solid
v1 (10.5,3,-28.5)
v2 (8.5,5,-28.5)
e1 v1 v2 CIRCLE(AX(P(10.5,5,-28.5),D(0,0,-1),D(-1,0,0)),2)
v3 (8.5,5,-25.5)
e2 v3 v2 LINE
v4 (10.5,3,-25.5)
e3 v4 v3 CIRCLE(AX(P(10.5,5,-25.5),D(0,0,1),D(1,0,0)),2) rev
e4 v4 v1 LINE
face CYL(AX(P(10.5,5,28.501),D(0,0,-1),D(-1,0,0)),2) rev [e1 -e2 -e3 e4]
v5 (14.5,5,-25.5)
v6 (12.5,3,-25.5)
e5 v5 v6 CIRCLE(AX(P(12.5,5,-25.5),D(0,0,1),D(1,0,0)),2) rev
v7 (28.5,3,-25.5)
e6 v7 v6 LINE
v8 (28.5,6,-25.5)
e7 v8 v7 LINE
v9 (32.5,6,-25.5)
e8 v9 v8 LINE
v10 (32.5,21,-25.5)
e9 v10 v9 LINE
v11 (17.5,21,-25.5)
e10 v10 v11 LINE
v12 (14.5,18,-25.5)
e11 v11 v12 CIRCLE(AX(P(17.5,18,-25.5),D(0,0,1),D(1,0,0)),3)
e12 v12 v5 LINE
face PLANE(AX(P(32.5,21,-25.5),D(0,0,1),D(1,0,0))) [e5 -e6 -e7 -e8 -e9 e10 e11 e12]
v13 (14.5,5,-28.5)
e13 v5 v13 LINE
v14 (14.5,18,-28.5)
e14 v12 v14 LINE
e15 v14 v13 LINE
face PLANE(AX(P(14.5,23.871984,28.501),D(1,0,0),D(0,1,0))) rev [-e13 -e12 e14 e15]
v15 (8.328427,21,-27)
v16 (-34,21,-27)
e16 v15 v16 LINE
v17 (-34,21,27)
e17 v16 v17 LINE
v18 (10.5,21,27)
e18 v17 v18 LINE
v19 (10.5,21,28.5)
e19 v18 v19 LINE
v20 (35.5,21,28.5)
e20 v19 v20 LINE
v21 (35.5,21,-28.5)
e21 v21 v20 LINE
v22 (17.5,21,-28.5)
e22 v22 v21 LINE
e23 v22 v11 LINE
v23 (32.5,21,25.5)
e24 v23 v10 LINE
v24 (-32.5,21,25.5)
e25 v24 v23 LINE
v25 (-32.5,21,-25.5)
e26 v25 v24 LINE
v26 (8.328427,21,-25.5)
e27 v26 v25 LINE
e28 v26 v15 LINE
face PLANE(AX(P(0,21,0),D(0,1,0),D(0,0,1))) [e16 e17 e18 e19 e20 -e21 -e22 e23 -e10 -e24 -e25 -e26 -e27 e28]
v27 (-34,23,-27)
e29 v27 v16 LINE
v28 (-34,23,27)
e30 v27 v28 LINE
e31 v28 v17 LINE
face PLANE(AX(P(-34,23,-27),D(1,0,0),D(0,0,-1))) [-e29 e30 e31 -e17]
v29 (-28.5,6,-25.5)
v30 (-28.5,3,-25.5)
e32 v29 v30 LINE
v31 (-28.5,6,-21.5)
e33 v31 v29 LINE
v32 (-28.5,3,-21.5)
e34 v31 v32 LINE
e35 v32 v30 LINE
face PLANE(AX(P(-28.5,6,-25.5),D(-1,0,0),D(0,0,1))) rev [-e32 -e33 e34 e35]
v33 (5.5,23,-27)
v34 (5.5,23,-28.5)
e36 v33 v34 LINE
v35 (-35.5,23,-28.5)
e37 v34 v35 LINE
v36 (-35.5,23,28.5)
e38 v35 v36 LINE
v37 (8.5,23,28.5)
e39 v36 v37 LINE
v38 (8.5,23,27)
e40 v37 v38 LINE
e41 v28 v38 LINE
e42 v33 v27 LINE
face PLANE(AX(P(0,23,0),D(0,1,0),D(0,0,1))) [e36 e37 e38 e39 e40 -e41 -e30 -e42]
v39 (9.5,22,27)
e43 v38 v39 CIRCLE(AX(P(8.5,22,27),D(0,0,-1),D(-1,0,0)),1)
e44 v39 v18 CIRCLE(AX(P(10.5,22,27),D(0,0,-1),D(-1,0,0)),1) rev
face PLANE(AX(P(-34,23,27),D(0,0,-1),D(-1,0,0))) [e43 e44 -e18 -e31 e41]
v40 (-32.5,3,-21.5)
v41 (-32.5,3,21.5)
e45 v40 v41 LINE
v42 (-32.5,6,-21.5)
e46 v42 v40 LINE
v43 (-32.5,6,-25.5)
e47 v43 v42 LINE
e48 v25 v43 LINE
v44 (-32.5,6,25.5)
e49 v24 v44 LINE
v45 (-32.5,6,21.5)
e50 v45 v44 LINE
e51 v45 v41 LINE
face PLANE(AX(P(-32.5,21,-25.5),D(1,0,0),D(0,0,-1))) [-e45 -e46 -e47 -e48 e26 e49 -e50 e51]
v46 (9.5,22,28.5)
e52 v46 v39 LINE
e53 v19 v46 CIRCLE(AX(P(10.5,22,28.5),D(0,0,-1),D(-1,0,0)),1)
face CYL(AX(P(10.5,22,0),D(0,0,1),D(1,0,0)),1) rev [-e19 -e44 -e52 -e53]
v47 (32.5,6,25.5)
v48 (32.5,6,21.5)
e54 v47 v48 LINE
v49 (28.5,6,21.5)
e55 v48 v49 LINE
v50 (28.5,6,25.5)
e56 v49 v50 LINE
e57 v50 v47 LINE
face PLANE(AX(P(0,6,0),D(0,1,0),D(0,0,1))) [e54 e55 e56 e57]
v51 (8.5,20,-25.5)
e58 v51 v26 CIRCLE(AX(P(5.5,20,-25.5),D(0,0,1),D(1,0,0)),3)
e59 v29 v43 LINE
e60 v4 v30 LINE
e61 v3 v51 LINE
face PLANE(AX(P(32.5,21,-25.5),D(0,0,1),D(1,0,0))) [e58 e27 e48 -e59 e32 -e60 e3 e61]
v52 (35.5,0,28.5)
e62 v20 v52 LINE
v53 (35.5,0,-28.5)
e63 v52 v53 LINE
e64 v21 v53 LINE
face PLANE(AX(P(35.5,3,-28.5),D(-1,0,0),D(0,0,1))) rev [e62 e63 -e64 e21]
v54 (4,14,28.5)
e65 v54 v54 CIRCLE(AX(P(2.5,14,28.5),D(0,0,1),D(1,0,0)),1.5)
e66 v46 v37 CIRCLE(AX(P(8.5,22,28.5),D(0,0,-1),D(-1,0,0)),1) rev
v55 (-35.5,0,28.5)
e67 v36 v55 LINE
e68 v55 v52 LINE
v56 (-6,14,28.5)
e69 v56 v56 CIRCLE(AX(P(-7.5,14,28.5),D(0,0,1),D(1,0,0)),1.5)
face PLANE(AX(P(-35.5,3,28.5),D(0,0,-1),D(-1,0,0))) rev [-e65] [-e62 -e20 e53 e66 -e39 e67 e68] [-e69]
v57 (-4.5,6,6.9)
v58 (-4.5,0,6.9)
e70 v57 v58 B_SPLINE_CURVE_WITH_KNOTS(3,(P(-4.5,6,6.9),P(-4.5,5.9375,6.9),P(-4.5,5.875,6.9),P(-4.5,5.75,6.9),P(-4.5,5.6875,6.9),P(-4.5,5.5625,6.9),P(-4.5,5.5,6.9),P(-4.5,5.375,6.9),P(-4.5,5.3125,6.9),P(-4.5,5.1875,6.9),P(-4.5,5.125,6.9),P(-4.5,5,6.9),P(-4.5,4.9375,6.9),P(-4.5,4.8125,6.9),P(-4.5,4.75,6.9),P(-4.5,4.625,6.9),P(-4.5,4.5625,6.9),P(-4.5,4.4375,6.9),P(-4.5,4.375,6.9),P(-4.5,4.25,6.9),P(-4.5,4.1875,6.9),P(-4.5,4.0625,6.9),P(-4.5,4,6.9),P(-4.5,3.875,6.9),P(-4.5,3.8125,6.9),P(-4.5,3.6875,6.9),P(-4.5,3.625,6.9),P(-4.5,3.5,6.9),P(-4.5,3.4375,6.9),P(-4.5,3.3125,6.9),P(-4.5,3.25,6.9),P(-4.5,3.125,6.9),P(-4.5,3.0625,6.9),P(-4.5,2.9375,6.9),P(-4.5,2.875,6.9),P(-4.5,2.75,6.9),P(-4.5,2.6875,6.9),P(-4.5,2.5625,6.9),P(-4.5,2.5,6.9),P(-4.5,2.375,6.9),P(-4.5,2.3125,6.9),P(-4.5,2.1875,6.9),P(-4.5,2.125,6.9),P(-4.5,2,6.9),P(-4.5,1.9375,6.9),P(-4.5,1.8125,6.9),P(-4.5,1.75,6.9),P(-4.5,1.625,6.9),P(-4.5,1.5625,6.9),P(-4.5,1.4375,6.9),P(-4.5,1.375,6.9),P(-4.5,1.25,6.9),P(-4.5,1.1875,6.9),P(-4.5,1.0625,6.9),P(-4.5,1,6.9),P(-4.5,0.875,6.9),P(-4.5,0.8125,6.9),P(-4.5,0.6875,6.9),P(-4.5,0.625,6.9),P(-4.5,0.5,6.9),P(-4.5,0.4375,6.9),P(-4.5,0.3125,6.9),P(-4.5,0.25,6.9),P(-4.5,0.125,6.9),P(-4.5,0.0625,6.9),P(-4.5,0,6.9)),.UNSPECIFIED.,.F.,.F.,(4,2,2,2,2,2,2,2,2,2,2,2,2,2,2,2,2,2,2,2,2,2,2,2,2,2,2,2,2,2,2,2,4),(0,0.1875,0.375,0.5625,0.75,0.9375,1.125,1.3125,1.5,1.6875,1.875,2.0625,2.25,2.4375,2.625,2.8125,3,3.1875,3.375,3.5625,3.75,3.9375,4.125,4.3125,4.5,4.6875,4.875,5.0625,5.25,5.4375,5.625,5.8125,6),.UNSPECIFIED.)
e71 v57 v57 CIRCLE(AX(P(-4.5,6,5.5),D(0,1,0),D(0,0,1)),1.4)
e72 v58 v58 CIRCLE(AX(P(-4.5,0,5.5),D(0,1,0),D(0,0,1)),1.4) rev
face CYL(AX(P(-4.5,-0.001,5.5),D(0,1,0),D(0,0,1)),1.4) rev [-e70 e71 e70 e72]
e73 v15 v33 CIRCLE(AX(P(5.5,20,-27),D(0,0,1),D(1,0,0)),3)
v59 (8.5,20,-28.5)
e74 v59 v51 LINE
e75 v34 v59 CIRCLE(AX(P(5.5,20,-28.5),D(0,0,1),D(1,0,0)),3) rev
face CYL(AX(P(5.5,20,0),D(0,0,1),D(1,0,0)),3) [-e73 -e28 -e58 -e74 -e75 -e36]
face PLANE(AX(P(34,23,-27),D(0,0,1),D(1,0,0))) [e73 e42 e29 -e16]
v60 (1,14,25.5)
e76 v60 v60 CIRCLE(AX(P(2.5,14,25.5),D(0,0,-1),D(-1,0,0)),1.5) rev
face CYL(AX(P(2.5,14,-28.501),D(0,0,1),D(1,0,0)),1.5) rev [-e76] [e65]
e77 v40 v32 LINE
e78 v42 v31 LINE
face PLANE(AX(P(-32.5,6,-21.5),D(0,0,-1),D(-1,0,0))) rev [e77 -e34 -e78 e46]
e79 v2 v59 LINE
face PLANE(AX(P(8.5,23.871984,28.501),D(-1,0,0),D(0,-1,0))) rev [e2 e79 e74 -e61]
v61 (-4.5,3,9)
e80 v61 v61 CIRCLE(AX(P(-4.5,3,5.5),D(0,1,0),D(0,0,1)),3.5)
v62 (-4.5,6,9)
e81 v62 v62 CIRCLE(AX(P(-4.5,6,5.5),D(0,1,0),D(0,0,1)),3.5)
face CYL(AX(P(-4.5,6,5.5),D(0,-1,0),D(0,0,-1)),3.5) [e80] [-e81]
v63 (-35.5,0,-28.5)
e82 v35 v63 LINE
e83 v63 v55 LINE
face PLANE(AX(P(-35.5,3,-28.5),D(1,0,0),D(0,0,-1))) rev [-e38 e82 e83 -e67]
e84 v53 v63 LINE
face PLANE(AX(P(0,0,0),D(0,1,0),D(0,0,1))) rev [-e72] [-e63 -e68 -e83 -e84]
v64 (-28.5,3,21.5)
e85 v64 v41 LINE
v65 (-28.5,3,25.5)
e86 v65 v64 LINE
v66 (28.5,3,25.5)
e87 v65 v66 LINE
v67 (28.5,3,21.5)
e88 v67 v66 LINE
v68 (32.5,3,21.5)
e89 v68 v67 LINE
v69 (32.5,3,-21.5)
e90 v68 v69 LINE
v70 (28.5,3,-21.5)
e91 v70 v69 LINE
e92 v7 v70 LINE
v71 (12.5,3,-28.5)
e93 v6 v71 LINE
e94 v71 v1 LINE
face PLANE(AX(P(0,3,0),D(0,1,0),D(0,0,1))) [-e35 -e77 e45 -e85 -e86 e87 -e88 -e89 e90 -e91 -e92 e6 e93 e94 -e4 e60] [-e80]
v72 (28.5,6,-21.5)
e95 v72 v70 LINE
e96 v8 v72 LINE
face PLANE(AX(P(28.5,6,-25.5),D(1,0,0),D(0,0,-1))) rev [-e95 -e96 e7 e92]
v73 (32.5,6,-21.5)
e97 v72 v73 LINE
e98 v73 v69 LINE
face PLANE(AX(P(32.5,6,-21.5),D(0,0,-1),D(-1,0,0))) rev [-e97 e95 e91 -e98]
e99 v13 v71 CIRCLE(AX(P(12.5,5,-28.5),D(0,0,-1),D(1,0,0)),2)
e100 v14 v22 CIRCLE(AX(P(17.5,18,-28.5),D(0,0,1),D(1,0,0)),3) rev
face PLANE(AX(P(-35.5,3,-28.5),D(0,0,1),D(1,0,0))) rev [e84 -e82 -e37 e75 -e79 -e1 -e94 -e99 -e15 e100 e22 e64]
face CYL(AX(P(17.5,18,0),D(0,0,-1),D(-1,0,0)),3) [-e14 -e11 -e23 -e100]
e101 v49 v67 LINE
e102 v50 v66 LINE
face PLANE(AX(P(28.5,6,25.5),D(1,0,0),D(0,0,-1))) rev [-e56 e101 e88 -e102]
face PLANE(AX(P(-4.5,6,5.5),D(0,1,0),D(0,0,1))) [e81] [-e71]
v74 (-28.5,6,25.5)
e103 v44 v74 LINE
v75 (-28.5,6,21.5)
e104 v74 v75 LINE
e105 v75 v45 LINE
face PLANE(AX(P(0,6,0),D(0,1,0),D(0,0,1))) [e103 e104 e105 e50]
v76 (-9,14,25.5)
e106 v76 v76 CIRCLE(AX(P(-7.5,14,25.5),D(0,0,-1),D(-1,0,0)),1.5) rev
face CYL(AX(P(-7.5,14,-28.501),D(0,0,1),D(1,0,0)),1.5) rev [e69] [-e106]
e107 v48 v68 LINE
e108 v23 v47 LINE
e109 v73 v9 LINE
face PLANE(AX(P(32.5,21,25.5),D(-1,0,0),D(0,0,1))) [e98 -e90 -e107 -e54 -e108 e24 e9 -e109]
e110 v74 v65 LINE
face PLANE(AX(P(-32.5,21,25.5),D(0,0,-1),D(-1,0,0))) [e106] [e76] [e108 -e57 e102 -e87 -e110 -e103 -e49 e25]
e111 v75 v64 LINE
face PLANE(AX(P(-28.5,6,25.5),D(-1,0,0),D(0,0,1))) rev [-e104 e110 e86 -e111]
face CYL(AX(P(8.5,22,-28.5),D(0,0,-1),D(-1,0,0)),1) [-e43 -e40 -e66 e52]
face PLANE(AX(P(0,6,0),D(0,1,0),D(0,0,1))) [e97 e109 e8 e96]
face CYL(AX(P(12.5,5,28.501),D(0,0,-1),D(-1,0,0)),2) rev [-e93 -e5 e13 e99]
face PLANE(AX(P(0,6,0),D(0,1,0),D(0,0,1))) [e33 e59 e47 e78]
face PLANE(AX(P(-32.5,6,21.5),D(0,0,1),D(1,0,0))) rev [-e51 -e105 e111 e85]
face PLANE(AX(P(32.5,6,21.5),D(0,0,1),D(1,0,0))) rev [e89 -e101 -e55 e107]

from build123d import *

# Parameters (mm, degrees)
SKETCH1_W           = 71
SKETCH1_H           = 57
BOSS_EXTRUDE1_DEPTH = 3
SKETCH2_W           = 71
SKETCH2_H           = 57
SKETCH2_W_2         = 65
SKETCH2_H_2         = 51
BOSS_EXTRUDE2_DEPTH = 18
SKETCH3_W           = 4
SKETCH3_H           = 4
BOSS_EXTRUDE3_DEPTH = 3
SKETCH4_R           = 3.5
BOSS_EXTRUDE4_DEPTH = 3
CUT_EXTRUDE1_REACH  = 49.932
SKETCH5_R           = 1.4
SKETCH6_W           = 71
SKETCH6_H           = 57
SKETCH6_W_2         = 68
SKETCH6_H_2         = 54
BOSS_EXTRUDE5_DEPTH = 2
SKETCH7_W           = 26
SKETCH7_H           = 2
CUT_EXTRUDE2_DEPTH  = 71.980631161
FILLET1_R           = 1
CUT_EXTRUDE3_REACH  = 72.981
FILLET2_R           = 3
FILLET3_R           = 3
CUT_EXTRUDE4_REACH  = 72.981
SKETCH9_R           = 1.5


with BuildPart() as part:
    # Sketch1 → Boss-Extrude1 (new body)
    with BuildSketch(Plane(origin=(0, 0, 0), x_dir=(1, 0, 0), z_dir=(0, 1, 0))):
        Rectangle(SKETCH1_W, SKETCH1_H)
    extrude(amount=BOSS_EXTRUDE1_DEPTH)

    # Sketch2 → Boss-Extrude2 (add)
    with BuildSketch(Plane(origin=(0, 3, 0), x_dir=(1, 0, 0), z_dir=(0, 1, 0))):
        Rectangle(SKETCH2_W, SKETCH2_H)
        Rectangle(SKETCH2_W_2, SKETCH2_H_2, mode=Mode.SUBTRACT)
    extrude(amount=BOSS_EXTRUDE2_DEPTH)

    # Sketch3 → Boss-Extrude3 (add)
    with BuildSketch(Plane(origin=(0, 3, 0), x_dir=(1, 0, 0), z_dir=(0, 1, 0))):
        with Locations((-30.5, 23.5)):
            Rectangle(SKETCH3_W, SKETCH3_H)
        with Locations((30.5, 23.5)):
            Rectangle(SKETCH3_W, SKETCH3_H)
        with Locations((30.5, -23.5)):
            Rectangle(SKETCH3_W, SKETCH3_H)
        with Locations((-30.5, -23.5)):
            Rectangle(SKETCH3_W, SKETCH3_H)
    extrude(amount=BOSS_EXTRUDE3_DEPTH)

    # Sketch4 → Boss-Extrude4 (add)
    with BuildSketch(Plane(origin=(0, 3, 0), x_dir=(1, 0, 0), z_dir=(0, 1, 0))):
        with Locations(Location((-4.5, -5.5, 0), (0, 0, 270))):
            Circle(SKETCH4_R)
    extrude(amount=BOSS_EXTRUDE4_DEPTH)

    # Sketch5 → Cut-Extrude1 (cut, up to next)
    with BuildSketch(Plane(origin=(0, 6, 0), x_dir=(1, 0, 0), z_dir=(0, 1, 0)), mode=Mode.PRIVATE) as cut_extrude1_sk1:
        with Locations(Location((-4.5, -5.5, 0), (0, 0, 270))):
            Circle(SKETCH5_R)
    cut_extrude1_tool1 = extrude(cut_extrude1_sk1.sketch, amount=-CUT_EXTRUDE1_REACH, mode=Mode.PRIVATE) & part.part
    add(cut_extrude1_tool1.solids().sort_by_distance((-4.5, 6, 5.5))[0], mode=Mode.SUBTRACT)

    # Sketch6 → Boss-Extrude5 (add)
    with BuildSketch(Plane(origin=(0, 21, 0), x_dir=(1, 0, 0), z_dir=(0, 1, 0))):
        Rectangle(SKETCH6_W, SKETCH6_H)
        Rectangle(SKETCH6_W_2, SKETCH6_H_2, mode=Mode.SUBTRACT)
    extrude(amount=BOSS_EXTRUDE5_DEPTH)

    # Sketch7 → Cut-Extrude2 (cut, through all)
    with BuildSketch(Plane.XY.offset(28.5)):
        with Locations((22.5, 22)):
            Rectangle(SKETCH7_W, SKETCH7_H)
    extrude(amount=-CUT_EXTRUDE2_DEPTH, mode=Mode.SUBTRACT)

    # Fillet1
    fillet1_edges = [part.edges().sort_by_distance(p)[0] for p in [
        (9.5, 21, -27.75),
        (9.5, 21, 27.75),
    ]]
    fillet(fillet1_edges, radius=FILLET1_R)
    fillet1_2_edges = [part.edges().sort_by_distance(p)[0] for p in [
        (9.5, 23, -27.75),
        (9.5, 23, 27.75),
    ]]
    fillet(fillet1_2_edges, radius=FILLET1_R - 0.0001)  # a hair under: the kernel refuses the full size

    # Sketch8 → Cut-Extrude3 (cut, up to next)
    with BuildSketch(Plane(origin=(0, 0, -28.5), x_dir=(-1, 0, 0), z_dir=(0, 0, -1)), mode=Mode.PRIVATE) as cut_extrude3_sk1:
        with BuildLine():
            Line((-14.5, 23.871984023), (-8.5, 23.871984023))
            Line((-8.5, 23.871984023), (-8.5, 5))
            ThreePointArc((-8.5, 5), (-9.085786438, 3.585786438), (-10.5, 3))
            Line((-10.5, 3), (-12.5, 3))
            ThreePointArc((-12.5, 3), (-13.914213562, 3.585786438), (-14.5, 5))
            Line((-14.5, 5), (-14.5, 23.871984023))
        make_face()
    cut_extrude3_tool1 = extrude(cut_extrude3_sk1.sketch, amount=-CUT_EXTRUDE3_REACH, mode=Mode.PRIVATE) & part.part
    add(cut_extrude3_tool1.solids().sort_by_distance((11.5, 13.574839, -28.5))[0], mode=Mode.SUBTRACT)

    # Fillet2
    fillet2_edges = [part.edges().sort_by_distance(p)[0] for p in [
        (14.5, 21, -27),
    ]]
    fillet(fillet2_edges, radius=FILLET2_R)

    # Fillet3
    fillet3_edges = [part.edges().sort_by_distance(p)[0] for p in [
        (8.5, 23, -27.75),
    ]]
    fillet(fillet3_edges, radius=FILLET3_R)

    # Sketch9 → Cut-Extrude4 (cut, up to next)
    with BuildSketch(Plane.XY.offset(28.5), mode=Mode.PRIVATE) as cut_extrude4_sk1:
        with Locations((2.5, 14)):
            Circle(SKETCH9_R)
    cut_extrude4_tool1 = extrude(cut_extrude4_sk1.sketch, amount=-CUT_EXTRUDE4_REACH, mode=Mode.PRIVATE) & part.part
    # Sketch9 → Cut-Extrude4 (cut, up to next)
    with BuildSketch(Plane.XY.offset(28.5), mode=Mode.PRIVATE) as cut_extrude4_sk2:
        with Locations((-7.5, 14)):
            Circle(SKETCH9_R)
    cut_extrude4_tool2 = extrude(cut_extrude4_sk2.sketch, amount=-CUT_EXTRUDE4_REACH, mode=Mode.PRIVATE) & part.part
    add(cut_extrude4_tool1.solids().sort_by_distance((2.5, 14, 28.5))[0], mode=Mode.SUBTRACT)
    add(cut_extrude4_tool2.solids().sort_by_distance((-7.5, 14, 28.5))[0], mode=Mode.SUBTRACT)


solid = part.part
